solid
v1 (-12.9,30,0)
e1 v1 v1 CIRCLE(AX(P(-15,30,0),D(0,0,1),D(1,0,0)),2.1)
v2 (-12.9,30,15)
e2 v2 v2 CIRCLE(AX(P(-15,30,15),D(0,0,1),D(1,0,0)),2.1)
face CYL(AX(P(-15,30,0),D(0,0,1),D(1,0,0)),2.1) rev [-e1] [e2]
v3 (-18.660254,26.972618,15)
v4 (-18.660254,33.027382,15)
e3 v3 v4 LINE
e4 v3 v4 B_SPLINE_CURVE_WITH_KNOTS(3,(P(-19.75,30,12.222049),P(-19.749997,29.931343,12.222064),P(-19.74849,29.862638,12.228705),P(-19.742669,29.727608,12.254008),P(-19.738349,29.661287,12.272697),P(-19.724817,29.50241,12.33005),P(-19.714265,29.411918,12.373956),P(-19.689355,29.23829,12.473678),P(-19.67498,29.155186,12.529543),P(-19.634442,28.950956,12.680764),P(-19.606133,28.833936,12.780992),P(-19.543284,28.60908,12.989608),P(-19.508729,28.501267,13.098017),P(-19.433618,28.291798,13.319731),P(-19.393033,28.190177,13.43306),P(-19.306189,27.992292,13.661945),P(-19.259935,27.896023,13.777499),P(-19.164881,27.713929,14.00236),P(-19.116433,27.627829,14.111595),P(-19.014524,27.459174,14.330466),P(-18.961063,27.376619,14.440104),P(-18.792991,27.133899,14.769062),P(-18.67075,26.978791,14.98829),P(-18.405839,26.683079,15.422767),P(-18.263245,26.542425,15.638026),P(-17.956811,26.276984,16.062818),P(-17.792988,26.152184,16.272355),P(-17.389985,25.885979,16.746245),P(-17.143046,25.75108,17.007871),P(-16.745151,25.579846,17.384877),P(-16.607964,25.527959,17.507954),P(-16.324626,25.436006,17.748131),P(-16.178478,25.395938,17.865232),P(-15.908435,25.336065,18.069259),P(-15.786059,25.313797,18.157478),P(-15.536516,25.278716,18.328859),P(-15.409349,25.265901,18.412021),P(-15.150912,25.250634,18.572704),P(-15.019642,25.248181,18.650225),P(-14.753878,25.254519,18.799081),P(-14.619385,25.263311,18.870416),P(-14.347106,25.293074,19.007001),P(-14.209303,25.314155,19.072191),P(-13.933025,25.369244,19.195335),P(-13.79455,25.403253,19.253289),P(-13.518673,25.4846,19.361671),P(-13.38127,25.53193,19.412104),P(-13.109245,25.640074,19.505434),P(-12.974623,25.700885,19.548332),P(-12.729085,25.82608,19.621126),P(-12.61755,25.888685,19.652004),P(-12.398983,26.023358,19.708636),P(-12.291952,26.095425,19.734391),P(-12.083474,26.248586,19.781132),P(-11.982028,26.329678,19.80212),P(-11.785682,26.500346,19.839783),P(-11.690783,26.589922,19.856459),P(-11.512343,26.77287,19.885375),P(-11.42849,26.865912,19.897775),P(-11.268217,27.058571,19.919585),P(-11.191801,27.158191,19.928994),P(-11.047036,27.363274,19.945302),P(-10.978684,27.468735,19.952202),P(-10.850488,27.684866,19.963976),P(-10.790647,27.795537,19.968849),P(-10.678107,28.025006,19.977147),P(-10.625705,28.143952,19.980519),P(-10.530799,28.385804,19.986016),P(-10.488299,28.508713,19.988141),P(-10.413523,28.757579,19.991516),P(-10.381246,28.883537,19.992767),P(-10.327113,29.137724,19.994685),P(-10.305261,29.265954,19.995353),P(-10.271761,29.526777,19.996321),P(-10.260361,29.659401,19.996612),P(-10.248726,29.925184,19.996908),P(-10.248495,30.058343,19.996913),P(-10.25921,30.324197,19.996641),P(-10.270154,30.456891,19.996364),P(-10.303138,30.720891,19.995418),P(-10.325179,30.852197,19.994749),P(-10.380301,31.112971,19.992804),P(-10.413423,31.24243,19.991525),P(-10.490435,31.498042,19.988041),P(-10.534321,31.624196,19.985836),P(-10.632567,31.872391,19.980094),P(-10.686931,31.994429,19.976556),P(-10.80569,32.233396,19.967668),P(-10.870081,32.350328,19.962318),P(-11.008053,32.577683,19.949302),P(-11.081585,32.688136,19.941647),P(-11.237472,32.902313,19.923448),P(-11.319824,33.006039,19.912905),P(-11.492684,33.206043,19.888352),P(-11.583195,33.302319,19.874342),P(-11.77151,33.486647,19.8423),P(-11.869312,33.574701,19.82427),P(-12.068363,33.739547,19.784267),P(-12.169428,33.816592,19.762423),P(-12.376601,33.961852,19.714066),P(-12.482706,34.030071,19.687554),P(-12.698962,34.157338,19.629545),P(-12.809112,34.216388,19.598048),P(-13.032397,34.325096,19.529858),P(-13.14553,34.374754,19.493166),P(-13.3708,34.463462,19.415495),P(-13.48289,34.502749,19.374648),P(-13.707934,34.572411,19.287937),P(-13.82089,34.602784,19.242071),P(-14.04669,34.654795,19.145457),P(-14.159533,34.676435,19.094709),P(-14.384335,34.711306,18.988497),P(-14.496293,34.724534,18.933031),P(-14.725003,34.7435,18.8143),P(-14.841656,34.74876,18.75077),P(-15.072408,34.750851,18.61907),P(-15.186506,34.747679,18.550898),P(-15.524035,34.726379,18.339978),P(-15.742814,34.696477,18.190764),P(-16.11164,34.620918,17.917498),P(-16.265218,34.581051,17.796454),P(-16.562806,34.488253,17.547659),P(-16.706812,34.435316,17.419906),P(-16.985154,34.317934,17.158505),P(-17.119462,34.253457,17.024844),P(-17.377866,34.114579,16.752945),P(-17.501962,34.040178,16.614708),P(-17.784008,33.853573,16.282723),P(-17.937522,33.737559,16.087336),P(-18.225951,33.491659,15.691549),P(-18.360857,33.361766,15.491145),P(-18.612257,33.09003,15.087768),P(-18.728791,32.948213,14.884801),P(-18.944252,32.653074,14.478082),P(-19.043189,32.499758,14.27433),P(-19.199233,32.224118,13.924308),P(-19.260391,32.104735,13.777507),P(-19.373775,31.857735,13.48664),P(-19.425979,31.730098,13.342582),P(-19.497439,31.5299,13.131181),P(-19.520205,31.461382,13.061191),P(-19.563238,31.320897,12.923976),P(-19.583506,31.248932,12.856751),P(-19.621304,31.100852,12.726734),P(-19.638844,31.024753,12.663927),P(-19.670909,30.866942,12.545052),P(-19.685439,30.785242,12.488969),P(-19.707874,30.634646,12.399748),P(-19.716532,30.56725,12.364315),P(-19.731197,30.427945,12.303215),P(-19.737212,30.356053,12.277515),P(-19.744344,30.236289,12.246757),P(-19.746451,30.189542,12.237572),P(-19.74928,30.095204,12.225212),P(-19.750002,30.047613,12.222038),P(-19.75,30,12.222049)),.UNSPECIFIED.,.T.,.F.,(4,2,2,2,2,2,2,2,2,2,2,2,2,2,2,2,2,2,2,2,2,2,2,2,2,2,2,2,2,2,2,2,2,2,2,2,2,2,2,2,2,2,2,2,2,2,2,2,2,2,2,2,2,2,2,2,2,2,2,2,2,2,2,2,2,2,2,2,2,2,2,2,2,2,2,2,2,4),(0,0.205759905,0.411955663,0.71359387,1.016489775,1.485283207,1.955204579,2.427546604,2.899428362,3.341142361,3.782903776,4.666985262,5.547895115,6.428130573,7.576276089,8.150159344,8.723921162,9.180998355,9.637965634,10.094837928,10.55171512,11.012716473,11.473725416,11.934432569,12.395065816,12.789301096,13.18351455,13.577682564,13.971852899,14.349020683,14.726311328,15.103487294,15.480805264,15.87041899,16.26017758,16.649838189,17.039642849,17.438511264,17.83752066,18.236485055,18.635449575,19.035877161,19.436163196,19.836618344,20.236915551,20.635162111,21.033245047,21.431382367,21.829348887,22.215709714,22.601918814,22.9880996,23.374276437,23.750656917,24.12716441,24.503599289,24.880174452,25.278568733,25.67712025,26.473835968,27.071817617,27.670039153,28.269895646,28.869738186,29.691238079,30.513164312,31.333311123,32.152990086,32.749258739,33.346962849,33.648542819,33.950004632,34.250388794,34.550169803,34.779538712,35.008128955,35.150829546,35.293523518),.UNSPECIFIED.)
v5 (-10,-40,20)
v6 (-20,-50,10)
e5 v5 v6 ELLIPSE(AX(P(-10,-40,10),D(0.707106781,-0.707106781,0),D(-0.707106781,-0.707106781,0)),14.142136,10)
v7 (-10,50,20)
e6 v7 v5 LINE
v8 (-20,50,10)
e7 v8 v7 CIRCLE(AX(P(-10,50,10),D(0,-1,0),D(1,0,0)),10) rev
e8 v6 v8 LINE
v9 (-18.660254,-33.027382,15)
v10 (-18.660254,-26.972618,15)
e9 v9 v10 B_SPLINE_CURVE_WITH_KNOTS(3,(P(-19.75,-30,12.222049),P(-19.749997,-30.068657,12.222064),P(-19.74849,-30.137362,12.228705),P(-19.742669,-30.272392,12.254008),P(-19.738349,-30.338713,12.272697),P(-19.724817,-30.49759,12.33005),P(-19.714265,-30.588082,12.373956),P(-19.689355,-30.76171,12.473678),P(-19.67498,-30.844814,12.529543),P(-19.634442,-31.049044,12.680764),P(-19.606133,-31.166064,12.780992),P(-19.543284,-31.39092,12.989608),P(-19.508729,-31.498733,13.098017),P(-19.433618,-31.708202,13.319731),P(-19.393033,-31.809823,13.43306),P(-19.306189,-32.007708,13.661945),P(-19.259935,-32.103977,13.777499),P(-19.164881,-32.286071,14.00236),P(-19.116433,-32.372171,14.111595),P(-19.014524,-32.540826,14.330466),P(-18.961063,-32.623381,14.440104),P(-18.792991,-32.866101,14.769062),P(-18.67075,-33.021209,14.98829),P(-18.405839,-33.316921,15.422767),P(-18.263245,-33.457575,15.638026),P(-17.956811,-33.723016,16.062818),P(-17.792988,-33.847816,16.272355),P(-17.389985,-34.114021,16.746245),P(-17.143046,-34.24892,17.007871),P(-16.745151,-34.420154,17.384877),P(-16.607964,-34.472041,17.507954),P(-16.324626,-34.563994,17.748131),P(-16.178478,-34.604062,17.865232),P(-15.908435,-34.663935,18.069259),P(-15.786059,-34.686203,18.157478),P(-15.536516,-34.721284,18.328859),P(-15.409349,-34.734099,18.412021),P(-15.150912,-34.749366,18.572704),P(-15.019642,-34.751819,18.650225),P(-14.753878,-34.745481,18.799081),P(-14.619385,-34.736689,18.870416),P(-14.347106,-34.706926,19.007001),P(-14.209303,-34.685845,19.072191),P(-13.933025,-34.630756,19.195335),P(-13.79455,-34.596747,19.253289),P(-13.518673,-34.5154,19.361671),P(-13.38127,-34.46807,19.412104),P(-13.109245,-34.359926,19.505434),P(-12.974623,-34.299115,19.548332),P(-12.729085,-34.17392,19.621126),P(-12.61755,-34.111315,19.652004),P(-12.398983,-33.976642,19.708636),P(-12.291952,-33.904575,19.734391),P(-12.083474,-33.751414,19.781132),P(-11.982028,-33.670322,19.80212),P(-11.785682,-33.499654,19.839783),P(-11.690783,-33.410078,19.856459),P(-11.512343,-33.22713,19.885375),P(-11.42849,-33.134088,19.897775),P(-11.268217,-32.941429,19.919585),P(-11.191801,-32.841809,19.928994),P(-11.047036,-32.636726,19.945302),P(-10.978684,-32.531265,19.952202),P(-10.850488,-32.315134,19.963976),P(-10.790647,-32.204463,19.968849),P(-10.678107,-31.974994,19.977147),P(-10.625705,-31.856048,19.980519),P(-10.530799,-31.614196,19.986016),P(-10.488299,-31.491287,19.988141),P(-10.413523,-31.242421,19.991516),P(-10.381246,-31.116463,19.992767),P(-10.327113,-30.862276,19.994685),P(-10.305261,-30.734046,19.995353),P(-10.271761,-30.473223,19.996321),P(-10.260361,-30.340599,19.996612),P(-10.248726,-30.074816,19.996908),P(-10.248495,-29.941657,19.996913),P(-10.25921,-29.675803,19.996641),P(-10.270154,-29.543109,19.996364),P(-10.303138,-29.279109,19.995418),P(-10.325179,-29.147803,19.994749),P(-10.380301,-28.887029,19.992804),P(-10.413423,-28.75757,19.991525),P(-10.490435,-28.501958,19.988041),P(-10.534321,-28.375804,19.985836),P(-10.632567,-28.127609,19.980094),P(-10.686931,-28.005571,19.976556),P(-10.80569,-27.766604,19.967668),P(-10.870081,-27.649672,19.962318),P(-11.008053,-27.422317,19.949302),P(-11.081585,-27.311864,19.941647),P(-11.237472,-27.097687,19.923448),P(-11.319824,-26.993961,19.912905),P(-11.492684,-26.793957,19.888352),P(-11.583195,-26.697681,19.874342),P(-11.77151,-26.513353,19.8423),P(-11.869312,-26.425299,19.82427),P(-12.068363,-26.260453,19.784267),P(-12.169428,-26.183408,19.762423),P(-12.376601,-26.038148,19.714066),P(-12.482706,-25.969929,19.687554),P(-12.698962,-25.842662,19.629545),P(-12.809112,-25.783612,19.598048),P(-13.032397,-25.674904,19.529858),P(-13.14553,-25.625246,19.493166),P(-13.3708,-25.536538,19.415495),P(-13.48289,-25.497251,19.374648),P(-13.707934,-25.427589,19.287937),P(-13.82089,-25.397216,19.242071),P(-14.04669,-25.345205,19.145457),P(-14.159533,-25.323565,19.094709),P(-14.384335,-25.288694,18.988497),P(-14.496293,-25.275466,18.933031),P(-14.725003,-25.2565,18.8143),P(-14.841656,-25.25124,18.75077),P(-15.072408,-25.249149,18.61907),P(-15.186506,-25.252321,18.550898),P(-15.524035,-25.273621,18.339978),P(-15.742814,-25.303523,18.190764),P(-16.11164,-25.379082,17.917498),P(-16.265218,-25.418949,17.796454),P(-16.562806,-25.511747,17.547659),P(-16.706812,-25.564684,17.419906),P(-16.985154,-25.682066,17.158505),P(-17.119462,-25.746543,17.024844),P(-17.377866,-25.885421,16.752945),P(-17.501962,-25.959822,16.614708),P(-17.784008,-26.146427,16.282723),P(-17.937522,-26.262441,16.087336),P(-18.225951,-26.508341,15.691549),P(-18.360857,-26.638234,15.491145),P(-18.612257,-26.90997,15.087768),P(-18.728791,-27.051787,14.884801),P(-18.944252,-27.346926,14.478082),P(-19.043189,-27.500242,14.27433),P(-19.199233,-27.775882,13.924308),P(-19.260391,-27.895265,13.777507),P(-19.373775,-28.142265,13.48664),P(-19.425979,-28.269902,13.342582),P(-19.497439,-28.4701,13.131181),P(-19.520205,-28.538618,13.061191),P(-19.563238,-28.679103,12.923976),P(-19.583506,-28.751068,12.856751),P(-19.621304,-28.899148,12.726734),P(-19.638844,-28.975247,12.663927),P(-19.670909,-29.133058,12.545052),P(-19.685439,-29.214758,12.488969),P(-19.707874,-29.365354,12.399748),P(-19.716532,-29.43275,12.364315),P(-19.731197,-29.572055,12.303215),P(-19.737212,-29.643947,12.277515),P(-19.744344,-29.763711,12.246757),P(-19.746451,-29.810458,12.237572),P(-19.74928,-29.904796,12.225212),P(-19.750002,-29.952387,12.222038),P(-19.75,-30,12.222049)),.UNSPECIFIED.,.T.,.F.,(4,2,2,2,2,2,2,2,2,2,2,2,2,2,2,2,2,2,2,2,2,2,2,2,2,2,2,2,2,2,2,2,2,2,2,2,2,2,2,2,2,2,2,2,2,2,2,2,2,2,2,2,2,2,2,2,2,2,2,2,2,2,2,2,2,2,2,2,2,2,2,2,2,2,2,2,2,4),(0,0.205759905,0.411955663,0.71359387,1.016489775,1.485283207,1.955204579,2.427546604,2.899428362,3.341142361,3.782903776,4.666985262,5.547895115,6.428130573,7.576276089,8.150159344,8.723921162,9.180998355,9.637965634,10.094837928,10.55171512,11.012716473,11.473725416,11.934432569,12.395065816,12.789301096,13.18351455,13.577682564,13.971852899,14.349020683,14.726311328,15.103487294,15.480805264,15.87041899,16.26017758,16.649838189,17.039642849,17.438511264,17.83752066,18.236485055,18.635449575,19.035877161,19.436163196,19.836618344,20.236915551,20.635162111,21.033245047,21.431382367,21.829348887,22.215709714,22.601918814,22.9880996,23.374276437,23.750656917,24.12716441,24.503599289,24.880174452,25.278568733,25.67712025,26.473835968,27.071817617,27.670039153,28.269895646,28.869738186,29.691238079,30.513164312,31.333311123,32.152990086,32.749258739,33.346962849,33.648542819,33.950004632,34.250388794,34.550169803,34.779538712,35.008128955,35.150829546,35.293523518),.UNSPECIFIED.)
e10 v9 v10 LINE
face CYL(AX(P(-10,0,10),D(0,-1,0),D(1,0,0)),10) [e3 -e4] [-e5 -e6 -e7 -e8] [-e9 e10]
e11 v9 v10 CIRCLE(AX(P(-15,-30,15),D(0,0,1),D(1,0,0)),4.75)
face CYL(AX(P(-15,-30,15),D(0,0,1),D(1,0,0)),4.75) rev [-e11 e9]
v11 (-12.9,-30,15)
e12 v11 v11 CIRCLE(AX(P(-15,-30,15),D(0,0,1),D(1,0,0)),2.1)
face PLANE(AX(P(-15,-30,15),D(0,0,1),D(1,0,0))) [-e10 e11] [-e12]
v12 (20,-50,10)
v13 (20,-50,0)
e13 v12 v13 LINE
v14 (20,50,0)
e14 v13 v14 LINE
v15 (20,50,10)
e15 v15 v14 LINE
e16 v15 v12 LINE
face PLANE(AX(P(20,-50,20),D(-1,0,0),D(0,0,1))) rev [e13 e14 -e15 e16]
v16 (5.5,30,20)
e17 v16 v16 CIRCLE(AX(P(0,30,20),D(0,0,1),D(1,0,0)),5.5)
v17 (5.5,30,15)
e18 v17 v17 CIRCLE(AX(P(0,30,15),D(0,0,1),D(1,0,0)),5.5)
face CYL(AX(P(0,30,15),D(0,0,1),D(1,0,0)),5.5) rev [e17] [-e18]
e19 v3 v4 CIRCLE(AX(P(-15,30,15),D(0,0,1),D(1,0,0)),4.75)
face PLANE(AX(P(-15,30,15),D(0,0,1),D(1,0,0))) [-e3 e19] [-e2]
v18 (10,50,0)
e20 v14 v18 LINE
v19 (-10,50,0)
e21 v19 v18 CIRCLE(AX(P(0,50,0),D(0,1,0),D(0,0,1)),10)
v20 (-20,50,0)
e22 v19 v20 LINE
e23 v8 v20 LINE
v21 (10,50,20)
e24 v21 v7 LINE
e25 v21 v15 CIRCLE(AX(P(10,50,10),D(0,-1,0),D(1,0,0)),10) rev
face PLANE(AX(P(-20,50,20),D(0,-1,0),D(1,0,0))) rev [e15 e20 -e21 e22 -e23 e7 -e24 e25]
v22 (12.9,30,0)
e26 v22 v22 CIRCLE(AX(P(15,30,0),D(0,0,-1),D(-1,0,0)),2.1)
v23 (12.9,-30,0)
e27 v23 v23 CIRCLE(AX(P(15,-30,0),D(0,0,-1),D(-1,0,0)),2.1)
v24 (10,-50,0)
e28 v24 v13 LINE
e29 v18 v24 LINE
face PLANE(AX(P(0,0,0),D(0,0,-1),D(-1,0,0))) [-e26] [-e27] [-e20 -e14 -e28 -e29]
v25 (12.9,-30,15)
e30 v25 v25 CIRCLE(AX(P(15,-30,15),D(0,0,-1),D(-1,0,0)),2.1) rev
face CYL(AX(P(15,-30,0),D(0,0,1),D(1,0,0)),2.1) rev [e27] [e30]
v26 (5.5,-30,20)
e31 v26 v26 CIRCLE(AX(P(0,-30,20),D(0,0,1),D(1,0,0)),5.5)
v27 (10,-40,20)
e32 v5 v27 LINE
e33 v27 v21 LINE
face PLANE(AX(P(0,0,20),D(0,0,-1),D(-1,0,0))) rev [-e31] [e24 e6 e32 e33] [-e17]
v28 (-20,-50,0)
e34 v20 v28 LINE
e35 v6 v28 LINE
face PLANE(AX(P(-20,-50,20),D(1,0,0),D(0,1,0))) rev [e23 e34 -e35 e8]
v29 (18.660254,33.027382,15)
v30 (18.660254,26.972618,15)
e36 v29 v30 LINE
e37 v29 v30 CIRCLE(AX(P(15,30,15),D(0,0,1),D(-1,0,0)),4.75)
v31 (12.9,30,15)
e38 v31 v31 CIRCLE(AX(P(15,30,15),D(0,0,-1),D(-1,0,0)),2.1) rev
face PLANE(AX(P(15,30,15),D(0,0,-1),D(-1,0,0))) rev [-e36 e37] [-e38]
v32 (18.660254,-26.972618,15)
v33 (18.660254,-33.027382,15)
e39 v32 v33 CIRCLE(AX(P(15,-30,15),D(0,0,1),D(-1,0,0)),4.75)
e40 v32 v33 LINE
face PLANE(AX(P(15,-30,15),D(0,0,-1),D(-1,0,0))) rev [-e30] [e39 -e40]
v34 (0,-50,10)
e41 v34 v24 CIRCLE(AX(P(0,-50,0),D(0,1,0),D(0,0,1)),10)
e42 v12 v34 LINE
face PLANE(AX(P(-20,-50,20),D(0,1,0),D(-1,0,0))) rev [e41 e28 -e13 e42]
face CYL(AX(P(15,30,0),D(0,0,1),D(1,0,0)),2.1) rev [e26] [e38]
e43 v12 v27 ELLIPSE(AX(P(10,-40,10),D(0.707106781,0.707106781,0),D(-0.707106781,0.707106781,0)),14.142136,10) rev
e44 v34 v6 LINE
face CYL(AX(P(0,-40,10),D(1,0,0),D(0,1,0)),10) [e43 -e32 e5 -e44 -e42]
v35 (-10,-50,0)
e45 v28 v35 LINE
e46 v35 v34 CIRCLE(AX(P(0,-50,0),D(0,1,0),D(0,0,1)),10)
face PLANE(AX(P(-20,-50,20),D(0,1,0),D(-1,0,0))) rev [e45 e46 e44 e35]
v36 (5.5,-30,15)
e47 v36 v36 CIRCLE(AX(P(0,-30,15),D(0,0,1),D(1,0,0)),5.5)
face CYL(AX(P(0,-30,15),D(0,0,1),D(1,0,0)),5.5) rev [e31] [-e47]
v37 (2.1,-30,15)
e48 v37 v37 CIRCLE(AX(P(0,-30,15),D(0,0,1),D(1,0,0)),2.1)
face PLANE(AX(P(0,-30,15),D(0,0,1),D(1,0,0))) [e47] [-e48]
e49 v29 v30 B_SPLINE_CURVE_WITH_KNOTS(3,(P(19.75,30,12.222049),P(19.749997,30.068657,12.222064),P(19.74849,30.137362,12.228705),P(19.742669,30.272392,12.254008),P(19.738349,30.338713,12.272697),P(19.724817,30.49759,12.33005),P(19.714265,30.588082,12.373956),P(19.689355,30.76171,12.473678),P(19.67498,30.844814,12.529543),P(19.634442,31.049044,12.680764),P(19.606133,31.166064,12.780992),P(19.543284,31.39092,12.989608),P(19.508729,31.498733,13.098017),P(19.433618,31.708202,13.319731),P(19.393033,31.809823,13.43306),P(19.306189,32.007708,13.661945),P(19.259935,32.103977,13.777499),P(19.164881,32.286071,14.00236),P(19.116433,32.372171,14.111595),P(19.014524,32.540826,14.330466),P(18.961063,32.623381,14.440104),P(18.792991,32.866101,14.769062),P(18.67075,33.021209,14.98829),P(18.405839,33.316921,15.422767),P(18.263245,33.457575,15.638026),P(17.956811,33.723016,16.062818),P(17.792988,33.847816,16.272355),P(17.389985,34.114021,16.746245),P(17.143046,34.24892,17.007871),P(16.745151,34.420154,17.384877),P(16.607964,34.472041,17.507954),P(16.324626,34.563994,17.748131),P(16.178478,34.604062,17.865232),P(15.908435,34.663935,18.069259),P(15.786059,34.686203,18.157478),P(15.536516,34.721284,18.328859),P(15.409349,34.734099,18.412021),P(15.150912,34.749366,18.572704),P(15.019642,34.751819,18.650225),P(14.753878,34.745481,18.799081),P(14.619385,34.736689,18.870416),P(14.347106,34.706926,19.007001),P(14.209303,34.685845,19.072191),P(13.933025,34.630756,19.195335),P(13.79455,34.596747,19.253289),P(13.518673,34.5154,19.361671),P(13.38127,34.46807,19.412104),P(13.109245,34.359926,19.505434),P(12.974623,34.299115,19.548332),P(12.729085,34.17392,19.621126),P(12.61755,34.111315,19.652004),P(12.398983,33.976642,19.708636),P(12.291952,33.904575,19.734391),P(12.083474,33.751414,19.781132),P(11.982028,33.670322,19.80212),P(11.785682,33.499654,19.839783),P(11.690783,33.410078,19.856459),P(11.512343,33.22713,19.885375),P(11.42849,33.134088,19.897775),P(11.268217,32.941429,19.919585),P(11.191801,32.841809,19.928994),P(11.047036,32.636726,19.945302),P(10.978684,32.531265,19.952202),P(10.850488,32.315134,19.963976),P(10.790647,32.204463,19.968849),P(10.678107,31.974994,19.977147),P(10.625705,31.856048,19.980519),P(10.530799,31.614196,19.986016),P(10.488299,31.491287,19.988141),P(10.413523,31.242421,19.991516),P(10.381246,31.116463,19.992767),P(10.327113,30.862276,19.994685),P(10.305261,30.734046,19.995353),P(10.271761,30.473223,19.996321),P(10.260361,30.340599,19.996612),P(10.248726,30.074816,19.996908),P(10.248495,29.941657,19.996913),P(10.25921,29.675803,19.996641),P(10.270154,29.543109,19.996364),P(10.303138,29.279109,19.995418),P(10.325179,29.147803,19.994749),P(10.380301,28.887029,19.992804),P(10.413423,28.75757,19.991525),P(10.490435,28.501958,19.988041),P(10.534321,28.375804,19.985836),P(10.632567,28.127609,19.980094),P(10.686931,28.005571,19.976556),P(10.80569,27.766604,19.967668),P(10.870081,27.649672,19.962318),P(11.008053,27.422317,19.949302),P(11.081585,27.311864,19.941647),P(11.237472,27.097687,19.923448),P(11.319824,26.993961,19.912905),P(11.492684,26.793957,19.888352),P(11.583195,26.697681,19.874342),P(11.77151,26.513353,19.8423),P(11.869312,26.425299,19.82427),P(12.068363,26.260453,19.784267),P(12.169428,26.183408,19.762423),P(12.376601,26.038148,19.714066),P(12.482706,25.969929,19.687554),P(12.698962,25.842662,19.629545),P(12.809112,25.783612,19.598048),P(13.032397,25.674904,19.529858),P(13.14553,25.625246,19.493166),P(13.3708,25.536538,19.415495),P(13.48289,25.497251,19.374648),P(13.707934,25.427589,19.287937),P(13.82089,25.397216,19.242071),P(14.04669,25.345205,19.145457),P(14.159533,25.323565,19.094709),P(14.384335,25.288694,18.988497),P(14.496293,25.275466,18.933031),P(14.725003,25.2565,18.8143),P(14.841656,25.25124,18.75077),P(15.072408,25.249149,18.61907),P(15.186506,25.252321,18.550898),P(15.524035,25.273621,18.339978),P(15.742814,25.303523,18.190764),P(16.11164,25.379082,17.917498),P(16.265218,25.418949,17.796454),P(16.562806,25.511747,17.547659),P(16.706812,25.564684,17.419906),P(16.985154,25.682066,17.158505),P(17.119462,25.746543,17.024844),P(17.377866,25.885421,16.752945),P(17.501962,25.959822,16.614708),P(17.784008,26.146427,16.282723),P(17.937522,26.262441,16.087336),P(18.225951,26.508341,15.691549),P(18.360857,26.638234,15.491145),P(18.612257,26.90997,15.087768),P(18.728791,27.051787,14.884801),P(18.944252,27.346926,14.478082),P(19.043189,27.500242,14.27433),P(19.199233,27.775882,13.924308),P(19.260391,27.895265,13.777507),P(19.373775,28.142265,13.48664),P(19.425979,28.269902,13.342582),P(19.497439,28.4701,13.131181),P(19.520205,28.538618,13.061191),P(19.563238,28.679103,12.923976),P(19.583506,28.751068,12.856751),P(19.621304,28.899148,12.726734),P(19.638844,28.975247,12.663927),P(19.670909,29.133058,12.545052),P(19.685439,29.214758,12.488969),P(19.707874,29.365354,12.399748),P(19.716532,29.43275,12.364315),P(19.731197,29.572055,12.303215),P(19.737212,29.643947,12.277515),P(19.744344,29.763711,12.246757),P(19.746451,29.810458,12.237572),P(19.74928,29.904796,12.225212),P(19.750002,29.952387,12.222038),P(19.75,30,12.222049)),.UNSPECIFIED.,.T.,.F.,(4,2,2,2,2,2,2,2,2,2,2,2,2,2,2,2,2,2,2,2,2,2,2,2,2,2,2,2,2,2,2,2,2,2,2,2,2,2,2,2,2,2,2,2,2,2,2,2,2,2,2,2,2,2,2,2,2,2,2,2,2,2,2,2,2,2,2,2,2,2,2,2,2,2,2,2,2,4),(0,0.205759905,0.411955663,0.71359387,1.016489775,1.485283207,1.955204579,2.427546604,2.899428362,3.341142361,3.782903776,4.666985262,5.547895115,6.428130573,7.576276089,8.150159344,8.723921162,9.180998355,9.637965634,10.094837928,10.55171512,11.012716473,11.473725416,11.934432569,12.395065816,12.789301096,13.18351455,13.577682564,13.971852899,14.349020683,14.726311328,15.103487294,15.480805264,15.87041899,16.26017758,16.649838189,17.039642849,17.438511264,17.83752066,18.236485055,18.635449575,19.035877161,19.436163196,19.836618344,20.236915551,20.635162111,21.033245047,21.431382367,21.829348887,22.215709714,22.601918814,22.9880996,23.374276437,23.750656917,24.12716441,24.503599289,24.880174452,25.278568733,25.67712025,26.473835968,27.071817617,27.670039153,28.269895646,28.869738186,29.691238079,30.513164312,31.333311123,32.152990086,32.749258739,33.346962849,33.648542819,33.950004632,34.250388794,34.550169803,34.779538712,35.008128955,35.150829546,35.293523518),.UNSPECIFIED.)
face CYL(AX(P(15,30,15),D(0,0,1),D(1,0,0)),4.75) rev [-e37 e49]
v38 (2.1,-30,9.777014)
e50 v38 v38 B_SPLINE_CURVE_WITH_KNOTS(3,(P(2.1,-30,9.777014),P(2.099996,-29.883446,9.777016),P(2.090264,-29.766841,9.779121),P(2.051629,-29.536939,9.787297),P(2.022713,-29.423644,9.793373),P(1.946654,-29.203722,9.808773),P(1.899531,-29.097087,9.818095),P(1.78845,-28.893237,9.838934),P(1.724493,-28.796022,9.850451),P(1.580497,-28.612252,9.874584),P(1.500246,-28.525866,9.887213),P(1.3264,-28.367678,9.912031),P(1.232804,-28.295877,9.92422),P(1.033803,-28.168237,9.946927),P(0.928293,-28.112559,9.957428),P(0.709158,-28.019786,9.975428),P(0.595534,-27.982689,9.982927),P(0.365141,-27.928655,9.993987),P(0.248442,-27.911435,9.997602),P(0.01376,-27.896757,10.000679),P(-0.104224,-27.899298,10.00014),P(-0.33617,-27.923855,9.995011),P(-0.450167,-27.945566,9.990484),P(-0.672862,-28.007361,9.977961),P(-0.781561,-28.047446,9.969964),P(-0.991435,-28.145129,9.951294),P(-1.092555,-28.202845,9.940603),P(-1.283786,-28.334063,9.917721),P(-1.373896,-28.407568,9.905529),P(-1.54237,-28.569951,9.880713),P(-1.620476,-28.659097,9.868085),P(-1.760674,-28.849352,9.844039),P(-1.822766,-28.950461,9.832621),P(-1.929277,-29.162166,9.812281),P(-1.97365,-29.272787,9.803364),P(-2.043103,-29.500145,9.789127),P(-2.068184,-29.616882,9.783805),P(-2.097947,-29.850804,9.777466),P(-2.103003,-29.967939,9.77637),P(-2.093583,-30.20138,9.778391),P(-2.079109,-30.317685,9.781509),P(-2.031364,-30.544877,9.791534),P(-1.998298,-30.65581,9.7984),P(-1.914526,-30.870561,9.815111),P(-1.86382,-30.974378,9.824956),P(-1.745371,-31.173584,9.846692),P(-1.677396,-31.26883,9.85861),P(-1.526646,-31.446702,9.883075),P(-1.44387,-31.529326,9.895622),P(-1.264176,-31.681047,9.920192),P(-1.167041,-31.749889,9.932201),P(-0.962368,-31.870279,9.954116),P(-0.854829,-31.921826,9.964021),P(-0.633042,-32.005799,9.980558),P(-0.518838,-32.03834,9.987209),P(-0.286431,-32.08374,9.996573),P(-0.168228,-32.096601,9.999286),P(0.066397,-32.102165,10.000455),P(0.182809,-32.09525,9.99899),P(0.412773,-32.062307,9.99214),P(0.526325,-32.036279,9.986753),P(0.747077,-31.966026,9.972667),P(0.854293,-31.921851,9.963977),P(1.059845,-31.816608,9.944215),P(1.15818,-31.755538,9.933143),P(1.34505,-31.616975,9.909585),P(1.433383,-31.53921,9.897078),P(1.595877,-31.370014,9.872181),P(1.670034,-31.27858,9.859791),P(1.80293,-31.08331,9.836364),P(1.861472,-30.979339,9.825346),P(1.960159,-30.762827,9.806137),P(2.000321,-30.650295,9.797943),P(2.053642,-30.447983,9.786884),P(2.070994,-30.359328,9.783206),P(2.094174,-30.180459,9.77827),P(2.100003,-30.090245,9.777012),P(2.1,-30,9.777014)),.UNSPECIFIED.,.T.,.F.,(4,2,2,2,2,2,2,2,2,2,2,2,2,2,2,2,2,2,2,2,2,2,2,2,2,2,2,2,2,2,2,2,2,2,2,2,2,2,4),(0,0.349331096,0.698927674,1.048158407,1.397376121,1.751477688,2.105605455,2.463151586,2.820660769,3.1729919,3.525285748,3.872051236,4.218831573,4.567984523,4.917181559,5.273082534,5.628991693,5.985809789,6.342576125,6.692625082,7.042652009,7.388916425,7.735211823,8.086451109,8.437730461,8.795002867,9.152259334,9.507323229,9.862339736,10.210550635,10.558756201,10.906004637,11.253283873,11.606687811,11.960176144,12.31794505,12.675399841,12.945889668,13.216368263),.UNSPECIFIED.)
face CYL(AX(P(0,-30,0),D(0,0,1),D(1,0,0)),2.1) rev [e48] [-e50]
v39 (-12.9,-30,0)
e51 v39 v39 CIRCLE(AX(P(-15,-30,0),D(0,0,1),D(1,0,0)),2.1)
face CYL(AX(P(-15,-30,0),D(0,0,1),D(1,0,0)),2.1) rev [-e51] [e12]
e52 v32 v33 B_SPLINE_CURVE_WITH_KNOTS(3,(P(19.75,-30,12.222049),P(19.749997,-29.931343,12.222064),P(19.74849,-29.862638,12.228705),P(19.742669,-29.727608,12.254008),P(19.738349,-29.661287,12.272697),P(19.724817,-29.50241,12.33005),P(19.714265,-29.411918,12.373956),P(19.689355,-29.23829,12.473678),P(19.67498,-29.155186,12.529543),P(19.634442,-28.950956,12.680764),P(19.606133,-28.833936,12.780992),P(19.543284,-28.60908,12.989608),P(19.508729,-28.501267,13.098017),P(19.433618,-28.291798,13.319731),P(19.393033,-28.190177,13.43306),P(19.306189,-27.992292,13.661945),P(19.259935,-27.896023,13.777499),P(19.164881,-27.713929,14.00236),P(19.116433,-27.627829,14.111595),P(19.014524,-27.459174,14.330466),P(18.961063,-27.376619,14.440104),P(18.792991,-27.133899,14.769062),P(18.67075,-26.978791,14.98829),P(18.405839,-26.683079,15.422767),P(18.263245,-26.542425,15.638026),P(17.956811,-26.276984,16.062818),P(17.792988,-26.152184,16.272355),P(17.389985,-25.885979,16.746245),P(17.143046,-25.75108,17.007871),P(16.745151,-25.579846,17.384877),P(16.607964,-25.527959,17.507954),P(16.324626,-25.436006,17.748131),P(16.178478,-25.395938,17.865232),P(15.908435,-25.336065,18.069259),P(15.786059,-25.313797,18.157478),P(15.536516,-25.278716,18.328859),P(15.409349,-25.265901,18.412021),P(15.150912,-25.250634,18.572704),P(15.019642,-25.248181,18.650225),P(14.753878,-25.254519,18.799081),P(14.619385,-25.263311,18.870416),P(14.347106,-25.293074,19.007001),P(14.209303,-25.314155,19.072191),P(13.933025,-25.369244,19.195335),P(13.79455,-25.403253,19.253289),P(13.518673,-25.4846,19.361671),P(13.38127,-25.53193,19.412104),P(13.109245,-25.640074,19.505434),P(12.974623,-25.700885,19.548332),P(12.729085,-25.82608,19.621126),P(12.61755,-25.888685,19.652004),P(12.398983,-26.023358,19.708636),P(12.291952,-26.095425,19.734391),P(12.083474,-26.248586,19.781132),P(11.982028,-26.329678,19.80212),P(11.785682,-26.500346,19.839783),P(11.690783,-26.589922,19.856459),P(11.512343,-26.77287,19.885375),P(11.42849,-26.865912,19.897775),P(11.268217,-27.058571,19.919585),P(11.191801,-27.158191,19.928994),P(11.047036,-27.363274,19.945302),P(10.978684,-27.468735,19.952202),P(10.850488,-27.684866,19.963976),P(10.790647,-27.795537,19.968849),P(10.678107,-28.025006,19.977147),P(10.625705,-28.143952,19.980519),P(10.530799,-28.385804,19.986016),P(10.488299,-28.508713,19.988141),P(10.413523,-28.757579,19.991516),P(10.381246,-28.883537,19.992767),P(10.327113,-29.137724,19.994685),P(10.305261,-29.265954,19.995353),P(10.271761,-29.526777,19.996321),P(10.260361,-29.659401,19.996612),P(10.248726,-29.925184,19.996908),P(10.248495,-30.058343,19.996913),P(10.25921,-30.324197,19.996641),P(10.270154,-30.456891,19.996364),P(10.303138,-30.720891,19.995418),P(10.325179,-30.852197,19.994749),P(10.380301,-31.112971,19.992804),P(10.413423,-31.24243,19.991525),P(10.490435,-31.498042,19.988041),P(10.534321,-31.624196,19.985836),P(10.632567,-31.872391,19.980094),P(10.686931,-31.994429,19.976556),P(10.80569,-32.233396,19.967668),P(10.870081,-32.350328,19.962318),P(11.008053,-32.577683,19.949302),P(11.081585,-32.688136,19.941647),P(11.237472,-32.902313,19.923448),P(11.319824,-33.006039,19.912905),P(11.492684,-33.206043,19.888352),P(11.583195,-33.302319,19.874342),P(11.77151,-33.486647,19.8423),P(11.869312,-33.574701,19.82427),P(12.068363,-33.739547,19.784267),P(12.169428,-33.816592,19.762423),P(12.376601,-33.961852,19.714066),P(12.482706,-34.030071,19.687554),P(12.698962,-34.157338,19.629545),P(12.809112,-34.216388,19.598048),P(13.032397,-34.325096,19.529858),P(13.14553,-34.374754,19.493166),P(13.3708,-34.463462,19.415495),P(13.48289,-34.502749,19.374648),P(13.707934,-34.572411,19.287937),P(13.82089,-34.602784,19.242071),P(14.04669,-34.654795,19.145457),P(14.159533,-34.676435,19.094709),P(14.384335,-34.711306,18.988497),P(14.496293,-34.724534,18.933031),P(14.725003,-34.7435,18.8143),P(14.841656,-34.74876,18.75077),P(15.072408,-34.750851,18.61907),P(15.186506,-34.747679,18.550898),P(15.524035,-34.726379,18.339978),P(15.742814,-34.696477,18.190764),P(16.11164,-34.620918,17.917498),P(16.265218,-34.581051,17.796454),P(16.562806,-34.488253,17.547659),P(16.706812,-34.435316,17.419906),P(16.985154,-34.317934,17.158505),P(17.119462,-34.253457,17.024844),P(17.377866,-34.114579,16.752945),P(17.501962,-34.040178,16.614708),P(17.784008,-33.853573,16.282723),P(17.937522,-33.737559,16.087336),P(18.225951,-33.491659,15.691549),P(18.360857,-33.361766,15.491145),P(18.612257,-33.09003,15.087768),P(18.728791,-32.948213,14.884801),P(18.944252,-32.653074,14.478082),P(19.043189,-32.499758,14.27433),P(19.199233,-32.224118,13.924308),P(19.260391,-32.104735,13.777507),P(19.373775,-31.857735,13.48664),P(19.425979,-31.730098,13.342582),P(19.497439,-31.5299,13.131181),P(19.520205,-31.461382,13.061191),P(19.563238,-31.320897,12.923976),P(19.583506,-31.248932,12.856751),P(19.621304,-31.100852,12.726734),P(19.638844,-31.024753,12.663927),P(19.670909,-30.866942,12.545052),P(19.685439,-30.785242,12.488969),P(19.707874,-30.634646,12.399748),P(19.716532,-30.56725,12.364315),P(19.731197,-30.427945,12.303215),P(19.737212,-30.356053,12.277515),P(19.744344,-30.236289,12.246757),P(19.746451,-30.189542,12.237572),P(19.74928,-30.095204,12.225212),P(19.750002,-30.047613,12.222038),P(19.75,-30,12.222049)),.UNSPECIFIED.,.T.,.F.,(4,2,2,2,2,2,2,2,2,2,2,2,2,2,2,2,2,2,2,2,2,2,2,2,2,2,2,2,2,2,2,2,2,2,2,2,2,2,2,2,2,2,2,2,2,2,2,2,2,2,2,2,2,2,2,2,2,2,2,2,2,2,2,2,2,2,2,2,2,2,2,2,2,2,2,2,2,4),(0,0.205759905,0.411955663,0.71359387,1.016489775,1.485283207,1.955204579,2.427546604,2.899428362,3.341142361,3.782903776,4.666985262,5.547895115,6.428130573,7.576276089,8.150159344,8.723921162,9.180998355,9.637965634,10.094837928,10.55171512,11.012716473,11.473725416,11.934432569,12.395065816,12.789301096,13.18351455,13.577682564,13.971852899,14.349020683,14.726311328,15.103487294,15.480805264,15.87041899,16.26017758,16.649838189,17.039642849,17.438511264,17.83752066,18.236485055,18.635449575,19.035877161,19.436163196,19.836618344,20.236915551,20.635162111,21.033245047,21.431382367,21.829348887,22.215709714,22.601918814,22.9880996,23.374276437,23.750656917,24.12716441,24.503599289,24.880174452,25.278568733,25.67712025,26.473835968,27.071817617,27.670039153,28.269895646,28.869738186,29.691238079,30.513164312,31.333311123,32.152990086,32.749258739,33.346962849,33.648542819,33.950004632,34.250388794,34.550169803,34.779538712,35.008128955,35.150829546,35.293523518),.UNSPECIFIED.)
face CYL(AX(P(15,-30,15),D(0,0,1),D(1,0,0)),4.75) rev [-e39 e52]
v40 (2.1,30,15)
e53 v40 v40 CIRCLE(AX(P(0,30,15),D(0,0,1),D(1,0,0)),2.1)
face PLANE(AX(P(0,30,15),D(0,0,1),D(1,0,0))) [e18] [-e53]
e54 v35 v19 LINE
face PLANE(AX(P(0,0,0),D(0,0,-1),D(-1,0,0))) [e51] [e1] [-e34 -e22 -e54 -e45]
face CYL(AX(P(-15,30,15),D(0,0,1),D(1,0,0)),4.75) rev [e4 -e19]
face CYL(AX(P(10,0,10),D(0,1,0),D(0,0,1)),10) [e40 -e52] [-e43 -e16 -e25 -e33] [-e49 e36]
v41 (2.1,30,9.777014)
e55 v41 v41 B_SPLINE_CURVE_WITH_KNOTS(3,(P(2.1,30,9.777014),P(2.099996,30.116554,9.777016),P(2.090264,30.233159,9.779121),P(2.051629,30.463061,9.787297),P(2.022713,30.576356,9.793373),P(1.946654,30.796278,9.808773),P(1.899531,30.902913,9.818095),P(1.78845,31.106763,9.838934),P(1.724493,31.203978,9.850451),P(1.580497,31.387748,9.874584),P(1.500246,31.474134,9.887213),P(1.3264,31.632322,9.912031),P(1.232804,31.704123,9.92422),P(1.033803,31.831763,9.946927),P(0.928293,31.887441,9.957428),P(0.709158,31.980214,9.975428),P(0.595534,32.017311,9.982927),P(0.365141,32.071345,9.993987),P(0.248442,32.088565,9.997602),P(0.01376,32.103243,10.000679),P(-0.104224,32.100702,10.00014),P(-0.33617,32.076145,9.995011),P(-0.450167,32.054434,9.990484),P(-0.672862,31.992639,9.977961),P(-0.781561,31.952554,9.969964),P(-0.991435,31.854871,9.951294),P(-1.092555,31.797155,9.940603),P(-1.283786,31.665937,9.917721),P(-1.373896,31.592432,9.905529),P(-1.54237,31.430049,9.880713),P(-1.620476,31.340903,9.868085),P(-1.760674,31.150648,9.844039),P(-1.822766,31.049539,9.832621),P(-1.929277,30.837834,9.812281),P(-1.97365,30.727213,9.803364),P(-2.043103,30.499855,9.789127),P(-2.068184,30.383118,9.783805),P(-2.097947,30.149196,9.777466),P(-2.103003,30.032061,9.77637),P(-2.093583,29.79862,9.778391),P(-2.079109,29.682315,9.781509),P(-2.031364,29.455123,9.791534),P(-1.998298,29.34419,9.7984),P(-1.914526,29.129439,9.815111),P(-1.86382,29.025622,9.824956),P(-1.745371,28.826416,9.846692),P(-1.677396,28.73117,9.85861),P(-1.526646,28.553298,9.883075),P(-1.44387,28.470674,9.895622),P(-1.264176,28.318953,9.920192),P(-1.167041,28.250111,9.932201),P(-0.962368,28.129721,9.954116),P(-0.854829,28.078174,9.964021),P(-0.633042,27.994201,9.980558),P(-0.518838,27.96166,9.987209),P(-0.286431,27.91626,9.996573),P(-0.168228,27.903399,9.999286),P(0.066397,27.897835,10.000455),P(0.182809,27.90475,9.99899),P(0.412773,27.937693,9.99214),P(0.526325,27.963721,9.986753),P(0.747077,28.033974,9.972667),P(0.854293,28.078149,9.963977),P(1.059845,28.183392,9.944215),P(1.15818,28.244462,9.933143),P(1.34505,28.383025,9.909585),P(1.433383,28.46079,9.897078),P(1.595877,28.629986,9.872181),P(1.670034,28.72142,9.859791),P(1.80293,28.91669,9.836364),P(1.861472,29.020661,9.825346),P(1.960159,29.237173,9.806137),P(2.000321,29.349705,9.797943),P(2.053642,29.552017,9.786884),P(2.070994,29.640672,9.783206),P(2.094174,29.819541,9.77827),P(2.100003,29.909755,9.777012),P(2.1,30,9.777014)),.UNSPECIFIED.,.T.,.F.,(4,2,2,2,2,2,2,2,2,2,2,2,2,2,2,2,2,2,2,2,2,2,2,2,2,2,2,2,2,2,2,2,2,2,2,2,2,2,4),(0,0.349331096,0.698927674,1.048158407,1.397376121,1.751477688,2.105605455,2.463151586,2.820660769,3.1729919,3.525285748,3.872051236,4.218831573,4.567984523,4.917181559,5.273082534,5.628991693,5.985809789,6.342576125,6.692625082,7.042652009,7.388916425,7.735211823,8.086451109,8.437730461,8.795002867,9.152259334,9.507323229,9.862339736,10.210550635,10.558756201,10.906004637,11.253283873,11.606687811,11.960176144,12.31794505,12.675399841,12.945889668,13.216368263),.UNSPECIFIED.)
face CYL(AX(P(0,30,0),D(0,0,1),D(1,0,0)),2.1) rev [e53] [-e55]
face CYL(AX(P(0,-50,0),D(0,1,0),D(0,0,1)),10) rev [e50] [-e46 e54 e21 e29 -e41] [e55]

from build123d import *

# Parameters (mm, degrees)
SKETCH3_W           = 40
SKETCH3_H           = 100
BOSS_EXTRUDE1_DEPTH = 20
SKETCH4_R           = 10
CUT_EXTRUDE1_DEPTH  = 104.923048454
SKETCH6_R           = 5.5
SKETCH6_R_2         = 2.1
SKETCH6_R_3         = 4.75
CUT_EXTRUDE10_DEPTH = 5
SKETCH6_2_R         = 2.1
CUT_EXTRUDE11_DEPTH = 58.445626465
FILLET1_R           = 10


with BuildPart() as part:
    # Sketch3 → Boss-Extrude1 (new body)
    with BuildSketch(Plane.XY):
        Rectangle(SKETCH3_W, SKETCH3_H)
    extrude(amount=BOSS_EXTRUDE1_DEPTH)

    # Sketch4 → Cut-Extrude1 (cut, through all)
    with BuildSketch(Plane(origin=(0, 50, 0), x_dir=(1, 0, 0), z_dir=(0, 1, 0))):
        Circle(SKETCH4_R)
    extrude(amount=-CUT_EXTRUDE1_DEPTH, mode=Mode.SUBTRACT)

    # Sketch6 → Cut-Extrude10 (cut)
    # profile 1 of 6: a face of its own
    with BuildSketch(Plane.XY.offset(20)):
        with Locations((0, 30)):
            Circle(SKETCH6_R)
        with Locations((0, 30)):
            Circle(SKETCH6_R_2, mode=Mode.SUBTRACT)
    # profile 2 of 6: a face of its own
    with BuildSketch(Plane.XY.offset(20)):
        with Locations((0, -30)):
            Circle(SKETCH6_R)
        with Locations((0, -30)):
            Circle(SKETCH6_R_2, mode=Mode.SUBTRACT)
    # profile 3 of 6: a face of its own
    with BuildSketch(Plane.XY.offset(20)):
        with Locations((-15, 30)):
            Circle(SKETCH6_R_3)
        with Locations((-15, 30)):
            Circle(SKETCH6_R_2, mode=Mode.SUBTRACT)
    # profile 4 of 6: a face of its own
    with BuildSketch(Plane.XY.offset(20)):
        with Locations((-15, -30)):
            Circle(SKETCH6_R_3)
        with Locations((-15, -30)):
            Circle(SKETCH6_R_2, mode=Mode.SUBTRACT)
    # profile 5 of 6: a face of its own
    with BuildSketch(Plane.XY.offset(20)):
        with Locations(Location((15, -30, 0), (0, 0, 180))):
            Circle(SKETCH6_R_3)
        with Locations(Location((15, -30, 0), (0, 0, 180))):
            Circle(SKETCH6_R_2, mode=Mode.SUBTRACT)
    # profile 6 of 6: a face of its own
    with BuildSketch(Plane.XY.offset(20)):
        with Locations(Location((15, 30, 0), (0, 0, 180))):
            Circle(SKETCH6_R_3)
        with Locations(Location((15, 30, 0), (0, 0, 180))):
            Circle(SKETCH6_R_2, mode=Mode.SUBTRACT)
    extrude(amount=-CUT_EXTRUDE10_DEPTH, mode=Mode.SUBTRACT)

    # Sketch6<2> → Cut-Extrude11 (cut, through all)
    with BuildSketch(Plane.XY.offset(20)):
        with Locations((0, 30)):
            Circle(SKETCH6_2_R)
        with Locations((0, -30)):
            Circle(SKETCH6_2_R)
        with Locations((-15, 30)):
            Circle(SKETCH6_2_R)
        with Locations((-15, -30)):
            Circle(SKETCH6_2_R)
        with Locations(Location((15, -30, 0), (0, 0, 180))):
            Circle(SKETCH6_2_R)
        with Locations(Location((15, 30, 0), (0, 0, 180))):
            Circle(SKETCH6_2_R)
    extrude(amount=-CUT_EXTRUDE11_DEPTH, mode=Mode.SUBTRACT)

    # Fillet1
    # the kernel refuses this fillet: 10 mm, written as the material it takes off along each edge
    with BuildSketch(Plane(origin=(-45, -50, 20), x_dir=(0, 0, -1), z_dir=(1, 0, 0))) as fillet1_piece_1:
        with BuildLine():
            CenterArc((FILLET1_R, FILLET1_R), FILLET1_R, 180, 90)
            Line((0, FILLET1_R), (0, 0))
            Line((0, 0), (FILLET1_R, 0))
        make_face()
    extrude(amount=90, mode=Mode.SUBTRACT)
    with BuildSketch(Plane(origin=(20, -75, 20), x_dir=(0, 0, -1), z_dir=(0, 1, 0))) as fillet1_piece_2:
        with BuildLine():
            CenterArc((FILLET1_R, FILLET1_R), FILLET1_R, 180, 90)
            Line((0, FILLET1_R), (0, 0))
            Line((0, 0), (FILLET1_R, 0))
        make_face()
    extrude(amount=150, mode=Mode.SUBTRACT)
    with BuildSketch(Plane(origin=(-20, 75, 20), x_dir=(1, 0, 0), z_dir=(0, -1, 0))) as fillet1_piece_3:
        with BuildLine():
            CenterArc((FILLET1_R, -FILLET1_R), FILLET1_R, 90, 90)
            Line((0, -FILLET1_R), (0, 0))
            Line((0, 0), (FILLET1_R, 0))
        make_face()
    extrude(amount=150, mode=Mode.SUBTRACT)


solid = part.part
